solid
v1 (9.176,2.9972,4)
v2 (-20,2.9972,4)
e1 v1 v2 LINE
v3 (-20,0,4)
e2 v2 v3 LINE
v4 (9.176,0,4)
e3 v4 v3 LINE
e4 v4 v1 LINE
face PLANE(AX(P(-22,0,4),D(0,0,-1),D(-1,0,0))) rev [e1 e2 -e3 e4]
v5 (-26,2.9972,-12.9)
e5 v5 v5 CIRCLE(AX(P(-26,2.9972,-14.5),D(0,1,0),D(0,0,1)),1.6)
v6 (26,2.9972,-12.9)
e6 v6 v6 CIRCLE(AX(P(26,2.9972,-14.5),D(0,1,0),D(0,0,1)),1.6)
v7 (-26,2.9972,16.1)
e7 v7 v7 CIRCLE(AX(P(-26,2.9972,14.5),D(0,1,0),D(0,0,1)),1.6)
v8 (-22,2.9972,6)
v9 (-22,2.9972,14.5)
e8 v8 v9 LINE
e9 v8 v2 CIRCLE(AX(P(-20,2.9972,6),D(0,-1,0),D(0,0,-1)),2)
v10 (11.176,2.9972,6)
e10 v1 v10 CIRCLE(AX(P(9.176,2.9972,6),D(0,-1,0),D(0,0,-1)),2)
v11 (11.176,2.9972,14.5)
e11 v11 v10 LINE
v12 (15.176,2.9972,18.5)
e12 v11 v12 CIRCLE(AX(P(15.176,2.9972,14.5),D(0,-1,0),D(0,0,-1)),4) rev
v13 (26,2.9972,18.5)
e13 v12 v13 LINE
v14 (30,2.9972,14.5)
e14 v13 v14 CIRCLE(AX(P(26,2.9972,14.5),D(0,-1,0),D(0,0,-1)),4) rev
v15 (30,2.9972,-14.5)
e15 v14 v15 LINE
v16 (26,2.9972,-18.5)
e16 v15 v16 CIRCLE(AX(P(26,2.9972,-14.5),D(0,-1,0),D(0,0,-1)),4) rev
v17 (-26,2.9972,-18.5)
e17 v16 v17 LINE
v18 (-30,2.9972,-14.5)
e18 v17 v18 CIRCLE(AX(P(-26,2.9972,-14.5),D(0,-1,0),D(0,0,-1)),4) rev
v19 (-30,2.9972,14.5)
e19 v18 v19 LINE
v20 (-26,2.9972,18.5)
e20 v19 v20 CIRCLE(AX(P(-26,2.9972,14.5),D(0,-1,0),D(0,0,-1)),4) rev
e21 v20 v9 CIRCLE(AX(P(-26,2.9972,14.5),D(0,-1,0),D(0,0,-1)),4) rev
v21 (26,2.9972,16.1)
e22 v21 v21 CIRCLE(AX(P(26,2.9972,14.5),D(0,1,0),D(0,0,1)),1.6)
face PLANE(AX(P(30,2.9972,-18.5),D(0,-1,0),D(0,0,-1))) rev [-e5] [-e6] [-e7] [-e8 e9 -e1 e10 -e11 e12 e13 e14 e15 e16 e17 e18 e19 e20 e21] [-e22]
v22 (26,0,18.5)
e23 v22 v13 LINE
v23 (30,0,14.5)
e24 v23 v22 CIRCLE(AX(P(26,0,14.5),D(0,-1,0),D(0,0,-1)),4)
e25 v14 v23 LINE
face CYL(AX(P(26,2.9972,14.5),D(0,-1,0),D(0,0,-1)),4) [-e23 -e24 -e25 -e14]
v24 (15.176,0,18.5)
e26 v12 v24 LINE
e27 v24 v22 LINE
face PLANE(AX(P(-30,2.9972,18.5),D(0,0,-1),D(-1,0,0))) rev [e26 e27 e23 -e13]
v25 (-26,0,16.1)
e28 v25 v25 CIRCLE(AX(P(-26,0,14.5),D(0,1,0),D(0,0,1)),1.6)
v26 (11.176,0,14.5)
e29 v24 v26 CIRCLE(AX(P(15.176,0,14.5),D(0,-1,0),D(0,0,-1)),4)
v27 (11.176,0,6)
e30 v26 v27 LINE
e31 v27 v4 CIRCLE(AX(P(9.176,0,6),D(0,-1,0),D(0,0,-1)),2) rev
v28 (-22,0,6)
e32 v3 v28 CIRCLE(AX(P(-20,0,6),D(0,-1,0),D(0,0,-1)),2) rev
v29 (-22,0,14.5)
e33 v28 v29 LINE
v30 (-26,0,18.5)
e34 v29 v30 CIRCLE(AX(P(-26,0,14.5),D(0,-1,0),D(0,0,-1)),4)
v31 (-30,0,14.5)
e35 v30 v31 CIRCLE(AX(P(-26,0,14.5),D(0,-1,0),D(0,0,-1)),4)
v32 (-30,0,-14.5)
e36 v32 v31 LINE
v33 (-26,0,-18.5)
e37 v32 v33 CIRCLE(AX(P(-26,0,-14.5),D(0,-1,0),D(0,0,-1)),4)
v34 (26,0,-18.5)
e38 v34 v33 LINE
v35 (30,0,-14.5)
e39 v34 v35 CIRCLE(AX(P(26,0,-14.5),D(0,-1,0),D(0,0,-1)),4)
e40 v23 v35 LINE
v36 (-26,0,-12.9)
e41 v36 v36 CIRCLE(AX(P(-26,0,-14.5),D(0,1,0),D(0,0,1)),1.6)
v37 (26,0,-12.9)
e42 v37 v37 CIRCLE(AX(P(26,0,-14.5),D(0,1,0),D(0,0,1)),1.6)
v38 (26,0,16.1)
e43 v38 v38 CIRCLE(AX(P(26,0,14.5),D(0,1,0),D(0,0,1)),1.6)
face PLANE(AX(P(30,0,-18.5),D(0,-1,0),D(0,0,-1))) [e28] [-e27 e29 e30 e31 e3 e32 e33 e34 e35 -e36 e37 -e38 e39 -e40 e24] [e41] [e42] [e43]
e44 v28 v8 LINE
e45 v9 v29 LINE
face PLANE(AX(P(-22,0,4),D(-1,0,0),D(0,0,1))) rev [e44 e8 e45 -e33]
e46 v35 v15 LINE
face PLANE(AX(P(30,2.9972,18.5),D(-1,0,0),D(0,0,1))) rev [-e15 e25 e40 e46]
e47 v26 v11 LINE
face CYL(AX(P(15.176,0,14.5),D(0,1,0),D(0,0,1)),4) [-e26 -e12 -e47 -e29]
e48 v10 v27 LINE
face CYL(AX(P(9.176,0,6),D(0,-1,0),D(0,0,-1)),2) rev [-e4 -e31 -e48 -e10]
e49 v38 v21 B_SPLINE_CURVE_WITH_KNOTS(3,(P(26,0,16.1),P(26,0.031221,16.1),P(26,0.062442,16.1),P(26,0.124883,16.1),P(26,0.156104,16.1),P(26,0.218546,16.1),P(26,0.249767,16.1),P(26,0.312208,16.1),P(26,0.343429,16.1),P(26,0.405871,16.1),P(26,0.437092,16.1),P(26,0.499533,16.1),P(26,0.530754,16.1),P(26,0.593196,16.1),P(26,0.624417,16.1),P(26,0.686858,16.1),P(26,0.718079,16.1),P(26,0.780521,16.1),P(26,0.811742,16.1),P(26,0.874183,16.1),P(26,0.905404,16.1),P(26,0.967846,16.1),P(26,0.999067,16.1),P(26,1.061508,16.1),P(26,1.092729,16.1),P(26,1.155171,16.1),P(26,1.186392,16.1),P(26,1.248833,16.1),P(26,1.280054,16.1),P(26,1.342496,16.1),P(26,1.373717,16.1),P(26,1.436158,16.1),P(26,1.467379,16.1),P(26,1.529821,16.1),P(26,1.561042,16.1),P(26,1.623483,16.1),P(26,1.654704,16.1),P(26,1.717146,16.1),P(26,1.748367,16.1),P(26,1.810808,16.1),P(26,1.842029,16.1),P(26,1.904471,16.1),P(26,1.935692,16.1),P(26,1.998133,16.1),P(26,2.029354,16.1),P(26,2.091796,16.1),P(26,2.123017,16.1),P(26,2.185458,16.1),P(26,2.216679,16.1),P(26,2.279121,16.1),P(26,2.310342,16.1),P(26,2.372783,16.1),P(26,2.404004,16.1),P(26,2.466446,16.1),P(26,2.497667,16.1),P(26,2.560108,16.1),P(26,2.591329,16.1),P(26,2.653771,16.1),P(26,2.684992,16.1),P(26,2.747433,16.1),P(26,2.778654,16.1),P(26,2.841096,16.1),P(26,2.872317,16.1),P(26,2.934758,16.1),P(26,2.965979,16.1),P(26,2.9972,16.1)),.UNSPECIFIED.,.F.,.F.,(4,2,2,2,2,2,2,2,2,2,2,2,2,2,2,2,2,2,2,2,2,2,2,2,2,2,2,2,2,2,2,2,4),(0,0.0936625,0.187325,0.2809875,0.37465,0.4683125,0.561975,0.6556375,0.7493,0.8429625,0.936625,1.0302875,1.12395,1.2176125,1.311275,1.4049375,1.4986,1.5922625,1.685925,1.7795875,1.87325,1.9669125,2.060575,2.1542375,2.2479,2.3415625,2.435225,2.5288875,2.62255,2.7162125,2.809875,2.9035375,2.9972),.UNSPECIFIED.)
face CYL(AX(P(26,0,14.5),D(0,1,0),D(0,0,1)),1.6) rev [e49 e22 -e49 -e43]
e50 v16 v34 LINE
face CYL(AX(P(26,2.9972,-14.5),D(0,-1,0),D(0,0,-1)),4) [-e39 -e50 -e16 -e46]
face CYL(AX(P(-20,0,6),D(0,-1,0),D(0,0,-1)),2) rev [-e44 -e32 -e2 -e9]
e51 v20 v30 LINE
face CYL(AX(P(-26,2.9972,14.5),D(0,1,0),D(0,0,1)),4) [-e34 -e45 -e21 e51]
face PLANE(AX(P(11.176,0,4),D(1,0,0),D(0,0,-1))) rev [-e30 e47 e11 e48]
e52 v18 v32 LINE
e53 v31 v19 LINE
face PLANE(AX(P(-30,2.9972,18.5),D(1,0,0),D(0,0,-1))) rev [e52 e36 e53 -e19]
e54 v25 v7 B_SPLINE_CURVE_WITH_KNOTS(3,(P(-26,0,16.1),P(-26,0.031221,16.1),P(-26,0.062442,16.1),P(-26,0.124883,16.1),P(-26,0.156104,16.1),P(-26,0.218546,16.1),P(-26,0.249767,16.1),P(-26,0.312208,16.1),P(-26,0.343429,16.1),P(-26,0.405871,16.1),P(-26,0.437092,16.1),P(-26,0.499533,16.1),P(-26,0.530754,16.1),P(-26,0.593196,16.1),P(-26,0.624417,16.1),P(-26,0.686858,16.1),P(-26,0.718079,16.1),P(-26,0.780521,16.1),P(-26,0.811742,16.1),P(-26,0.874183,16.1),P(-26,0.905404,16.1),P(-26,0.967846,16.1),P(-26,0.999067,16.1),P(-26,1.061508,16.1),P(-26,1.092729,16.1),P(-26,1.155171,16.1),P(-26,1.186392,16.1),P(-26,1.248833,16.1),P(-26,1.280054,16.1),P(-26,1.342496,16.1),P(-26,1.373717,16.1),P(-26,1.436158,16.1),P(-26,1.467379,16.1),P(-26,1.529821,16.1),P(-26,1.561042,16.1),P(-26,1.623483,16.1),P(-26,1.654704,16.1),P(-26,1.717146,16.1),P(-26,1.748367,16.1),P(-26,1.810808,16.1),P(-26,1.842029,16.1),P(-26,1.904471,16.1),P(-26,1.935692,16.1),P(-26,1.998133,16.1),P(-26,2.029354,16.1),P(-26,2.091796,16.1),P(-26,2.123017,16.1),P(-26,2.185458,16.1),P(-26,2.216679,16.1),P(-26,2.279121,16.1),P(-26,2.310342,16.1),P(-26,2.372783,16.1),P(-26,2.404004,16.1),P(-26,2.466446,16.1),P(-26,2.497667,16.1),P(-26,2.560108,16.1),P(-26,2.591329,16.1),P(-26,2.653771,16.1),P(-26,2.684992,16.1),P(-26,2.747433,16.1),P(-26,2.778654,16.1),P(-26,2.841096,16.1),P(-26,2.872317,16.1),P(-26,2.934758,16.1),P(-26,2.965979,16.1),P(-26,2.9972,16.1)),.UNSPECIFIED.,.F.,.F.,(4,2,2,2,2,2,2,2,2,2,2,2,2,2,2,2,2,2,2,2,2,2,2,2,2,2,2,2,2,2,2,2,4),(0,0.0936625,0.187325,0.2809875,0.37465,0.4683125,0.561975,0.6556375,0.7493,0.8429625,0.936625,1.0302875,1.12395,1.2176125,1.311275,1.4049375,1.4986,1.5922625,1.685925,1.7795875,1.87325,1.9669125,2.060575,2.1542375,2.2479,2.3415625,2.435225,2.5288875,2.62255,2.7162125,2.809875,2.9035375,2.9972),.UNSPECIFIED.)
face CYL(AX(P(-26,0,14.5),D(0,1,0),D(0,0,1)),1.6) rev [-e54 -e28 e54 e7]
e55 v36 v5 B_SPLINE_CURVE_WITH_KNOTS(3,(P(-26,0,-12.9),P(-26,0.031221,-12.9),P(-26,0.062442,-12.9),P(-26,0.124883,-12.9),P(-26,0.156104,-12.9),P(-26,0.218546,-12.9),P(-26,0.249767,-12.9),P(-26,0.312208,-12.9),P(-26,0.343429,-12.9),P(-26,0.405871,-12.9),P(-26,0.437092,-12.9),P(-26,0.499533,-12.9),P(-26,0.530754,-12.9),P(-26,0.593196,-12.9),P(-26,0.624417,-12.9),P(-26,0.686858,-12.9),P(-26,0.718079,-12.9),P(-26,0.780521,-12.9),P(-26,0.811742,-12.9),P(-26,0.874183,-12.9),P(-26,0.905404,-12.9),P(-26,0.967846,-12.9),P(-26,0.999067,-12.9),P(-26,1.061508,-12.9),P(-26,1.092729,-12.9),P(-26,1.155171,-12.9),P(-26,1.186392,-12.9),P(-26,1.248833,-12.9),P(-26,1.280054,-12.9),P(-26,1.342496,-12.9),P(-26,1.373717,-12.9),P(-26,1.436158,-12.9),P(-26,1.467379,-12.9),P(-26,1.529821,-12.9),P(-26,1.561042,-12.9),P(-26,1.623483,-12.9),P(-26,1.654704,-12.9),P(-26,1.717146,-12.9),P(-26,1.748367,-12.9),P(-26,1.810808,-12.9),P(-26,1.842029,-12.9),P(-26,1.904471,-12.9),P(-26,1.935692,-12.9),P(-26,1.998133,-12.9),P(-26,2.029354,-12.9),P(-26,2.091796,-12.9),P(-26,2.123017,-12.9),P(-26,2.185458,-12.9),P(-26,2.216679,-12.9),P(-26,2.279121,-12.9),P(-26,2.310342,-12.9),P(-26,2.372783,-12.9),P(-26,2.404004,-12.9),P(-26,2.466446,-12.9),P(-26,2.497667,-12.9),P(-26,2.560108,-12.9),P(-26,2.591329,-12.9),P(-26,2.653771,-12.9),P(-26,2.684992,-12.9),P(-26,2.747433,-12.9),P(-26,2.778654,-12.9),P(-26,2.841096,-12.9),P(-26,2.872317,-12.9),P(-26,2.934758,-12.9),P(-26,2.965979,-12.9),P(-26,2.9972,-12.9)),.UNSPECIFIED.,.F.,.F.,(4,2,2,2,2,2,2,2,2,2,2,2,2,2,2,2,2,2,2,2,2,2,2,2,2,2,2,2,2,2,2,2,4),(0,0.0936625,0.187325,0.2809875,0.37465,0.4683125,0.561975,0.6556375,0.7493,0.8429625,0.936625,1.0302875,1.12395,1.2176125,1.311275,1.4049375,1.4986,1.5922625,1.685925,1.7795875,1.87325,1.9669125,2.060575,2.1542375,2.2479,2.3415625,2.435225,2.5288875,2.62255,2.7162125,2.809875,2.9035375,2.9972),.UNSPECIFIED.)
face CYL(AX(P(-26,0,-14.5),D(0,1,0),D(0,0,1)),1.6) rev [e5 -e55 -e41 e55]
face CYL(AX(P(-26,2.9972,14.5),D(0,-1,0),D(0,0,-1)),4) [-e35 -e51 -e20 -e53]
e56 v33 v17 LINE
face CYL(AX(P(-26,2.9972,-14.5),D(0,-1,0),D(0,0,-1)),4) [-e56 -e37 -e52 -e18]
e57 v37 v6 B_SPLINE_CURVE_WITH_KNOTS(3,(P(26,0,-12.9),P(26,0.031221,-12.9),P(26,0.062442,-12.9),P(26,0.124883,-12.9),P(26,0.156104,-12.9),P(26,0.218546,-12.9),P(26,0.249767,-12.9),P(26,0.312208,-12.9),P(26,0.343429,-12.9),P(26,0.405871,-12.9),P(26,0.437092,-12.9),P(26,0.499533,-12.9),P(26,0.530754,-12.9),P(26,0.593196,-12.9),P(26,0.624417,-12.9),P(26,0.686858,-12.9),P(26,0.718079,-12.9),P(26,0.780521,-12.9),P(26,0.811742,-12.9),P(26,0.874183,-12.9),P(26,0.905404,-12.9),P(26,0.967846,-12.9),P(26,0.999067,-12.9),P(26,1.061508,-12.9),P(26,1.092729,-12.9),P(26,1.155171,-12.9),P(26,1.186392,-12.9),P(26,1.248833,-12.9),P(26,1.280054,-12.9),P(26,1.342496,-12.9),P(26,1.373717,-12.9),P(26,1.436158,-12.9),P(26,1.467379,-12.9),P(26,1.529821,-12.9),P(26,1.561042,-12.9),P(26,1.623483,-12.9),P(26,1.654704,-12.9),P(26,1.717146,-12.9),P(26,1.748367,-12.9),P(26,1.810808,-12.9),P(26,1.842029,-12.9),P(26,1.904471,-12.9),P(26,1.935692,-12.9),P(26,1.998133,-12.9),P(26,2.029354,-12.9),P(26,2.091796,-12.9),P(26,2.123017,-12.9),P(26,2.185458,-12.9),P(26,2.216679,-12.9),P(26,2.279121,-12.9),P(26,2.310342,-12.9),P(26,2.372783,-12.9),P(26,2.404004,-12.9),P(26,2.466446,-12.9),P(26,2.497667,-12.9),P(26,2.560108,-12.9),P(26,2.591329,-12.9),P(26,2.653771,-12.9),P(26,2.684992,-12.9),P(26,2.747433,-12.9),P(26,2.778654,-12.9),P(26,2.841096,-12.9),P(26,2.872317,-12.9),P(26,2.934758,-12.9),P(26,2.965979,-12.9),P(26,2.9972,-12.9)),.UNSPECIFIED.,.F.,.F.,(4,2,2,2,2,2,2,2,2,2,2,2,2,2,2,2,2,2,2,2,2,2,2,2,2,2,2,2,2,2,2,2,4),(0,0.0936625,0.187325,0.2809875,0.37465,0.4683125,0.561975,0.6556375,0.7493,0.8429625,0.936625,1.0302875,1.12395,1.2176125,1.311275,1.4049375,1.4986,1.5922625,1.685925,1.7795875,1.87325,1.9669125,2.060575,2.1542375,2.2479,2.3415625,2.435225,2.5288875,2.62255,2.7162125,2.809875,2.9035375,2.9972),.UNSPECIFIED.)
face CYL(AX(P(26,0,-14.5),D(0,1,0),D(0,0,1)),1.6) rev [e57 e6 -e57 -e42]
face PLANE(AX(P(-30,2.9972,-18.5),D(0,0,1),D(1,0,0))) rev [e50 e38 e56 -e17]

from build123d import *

# Parameters (mm, degrees)
SKETCH1_W           = 60
SKETCH1_H           = 37
BOSS_EXTRUDE1_DEPTH = 2.9972
FILLET1_R           = 4
SKETCH2_R           = 1.6
CUT_EXTRUDE1_DEPTH  = 36.372774952
SKETCH3_W           = 33.176
SKETCH3_H           = 14.5
CUT_EXTRUDE2_DEPTH  = 36.372774952
FILLET2_R           = 4
FILLET3_R           = 2


with BuildPart() as part:
    # Sketch1 → Boss-Extrude1 (new body)
    with BuildSketch(Plane(origin=(0, 0, 0), x_dir=(1, 0, 0), z_dir=(0, 1, 0))):
        Rectangle(SKETCH1_W, SKETCH1_H)
    extrude(amount=BOSS_EXTRUDE1_DEPTH)

    # Fillet1
    fillet1_edges = [part.edges().sort_by_distance(p)[0] for p in [
        (30, 1.4986, 18.5),
        (-30, 1.4986, 18.5),
        (-30, 1.4986, -18.5),
        (30, 1.4986, -18.5),
    ]]
    fillet(fillet1_edges, radius=FILLET1_R)

    # Sketch2 → Cut-Extrude1 (cut, through all)
    with BuildSketch(Plane(origin=(0, 2.9972, 0), x_dir=(1, 0, 0), z_dir=(0, 1, 0))):
        with Locations(Location((-26, 14.5, 0), (0, 0, 270))):
            Circle(SKETCH2_R)
        with Locations(Location((-26, -14.5, 0), (0, 0, 270))):
            Circle(SKETCH2_R)
        with Locations(Location((26, -14.5, 0), (0, 0, 270))):
            Circle(SKETCH2_R)
        with Locations(Location((26, 14.5, 0), (0, 0, 270))):
            Circle(SKETCH2_R)
    extrude(amount=-CUT_EXTRUDE1_DEPTH, mode=Mode.SUBTRACT)

    # Sketch3 → Cut-Extrude2 (cut, through all)
    with BuildSketch(Plane(origin=(0, 2.9972, 0), x_dir=(1, 0, 0), z_dir=(0, 1, 0))):
        with Locations((-5.412, -11.25)):
            Rectangle(SKETCH3_W, SKETCH3_H)
    extrude(amount=-CUT_EXTRUDE2_DEPTH, mode=Mode.SUBTRACT)

    # Fillet2
    fillet2_edges = [part.edges().sort_by_distance(p)[0] for p in [
        (11.176, 1.4986, 18.5),
        (-22, 1.4986, 18.5),
    ]]
    fillet(fillet2_edges, radius=FILLET2_R - 0.0001)  # a hair under: the kernel refuses the full size

    # Fillet3
    fillet3_edges = [part.edges().sort_by_distance(p)[0] for p in [
        (11.176, 1.4986, 4),
        (-22, 1.4986, 4),
    ]]
    fillet(fillet3_edges, radius=FILLET3_R)


solid = part.part
